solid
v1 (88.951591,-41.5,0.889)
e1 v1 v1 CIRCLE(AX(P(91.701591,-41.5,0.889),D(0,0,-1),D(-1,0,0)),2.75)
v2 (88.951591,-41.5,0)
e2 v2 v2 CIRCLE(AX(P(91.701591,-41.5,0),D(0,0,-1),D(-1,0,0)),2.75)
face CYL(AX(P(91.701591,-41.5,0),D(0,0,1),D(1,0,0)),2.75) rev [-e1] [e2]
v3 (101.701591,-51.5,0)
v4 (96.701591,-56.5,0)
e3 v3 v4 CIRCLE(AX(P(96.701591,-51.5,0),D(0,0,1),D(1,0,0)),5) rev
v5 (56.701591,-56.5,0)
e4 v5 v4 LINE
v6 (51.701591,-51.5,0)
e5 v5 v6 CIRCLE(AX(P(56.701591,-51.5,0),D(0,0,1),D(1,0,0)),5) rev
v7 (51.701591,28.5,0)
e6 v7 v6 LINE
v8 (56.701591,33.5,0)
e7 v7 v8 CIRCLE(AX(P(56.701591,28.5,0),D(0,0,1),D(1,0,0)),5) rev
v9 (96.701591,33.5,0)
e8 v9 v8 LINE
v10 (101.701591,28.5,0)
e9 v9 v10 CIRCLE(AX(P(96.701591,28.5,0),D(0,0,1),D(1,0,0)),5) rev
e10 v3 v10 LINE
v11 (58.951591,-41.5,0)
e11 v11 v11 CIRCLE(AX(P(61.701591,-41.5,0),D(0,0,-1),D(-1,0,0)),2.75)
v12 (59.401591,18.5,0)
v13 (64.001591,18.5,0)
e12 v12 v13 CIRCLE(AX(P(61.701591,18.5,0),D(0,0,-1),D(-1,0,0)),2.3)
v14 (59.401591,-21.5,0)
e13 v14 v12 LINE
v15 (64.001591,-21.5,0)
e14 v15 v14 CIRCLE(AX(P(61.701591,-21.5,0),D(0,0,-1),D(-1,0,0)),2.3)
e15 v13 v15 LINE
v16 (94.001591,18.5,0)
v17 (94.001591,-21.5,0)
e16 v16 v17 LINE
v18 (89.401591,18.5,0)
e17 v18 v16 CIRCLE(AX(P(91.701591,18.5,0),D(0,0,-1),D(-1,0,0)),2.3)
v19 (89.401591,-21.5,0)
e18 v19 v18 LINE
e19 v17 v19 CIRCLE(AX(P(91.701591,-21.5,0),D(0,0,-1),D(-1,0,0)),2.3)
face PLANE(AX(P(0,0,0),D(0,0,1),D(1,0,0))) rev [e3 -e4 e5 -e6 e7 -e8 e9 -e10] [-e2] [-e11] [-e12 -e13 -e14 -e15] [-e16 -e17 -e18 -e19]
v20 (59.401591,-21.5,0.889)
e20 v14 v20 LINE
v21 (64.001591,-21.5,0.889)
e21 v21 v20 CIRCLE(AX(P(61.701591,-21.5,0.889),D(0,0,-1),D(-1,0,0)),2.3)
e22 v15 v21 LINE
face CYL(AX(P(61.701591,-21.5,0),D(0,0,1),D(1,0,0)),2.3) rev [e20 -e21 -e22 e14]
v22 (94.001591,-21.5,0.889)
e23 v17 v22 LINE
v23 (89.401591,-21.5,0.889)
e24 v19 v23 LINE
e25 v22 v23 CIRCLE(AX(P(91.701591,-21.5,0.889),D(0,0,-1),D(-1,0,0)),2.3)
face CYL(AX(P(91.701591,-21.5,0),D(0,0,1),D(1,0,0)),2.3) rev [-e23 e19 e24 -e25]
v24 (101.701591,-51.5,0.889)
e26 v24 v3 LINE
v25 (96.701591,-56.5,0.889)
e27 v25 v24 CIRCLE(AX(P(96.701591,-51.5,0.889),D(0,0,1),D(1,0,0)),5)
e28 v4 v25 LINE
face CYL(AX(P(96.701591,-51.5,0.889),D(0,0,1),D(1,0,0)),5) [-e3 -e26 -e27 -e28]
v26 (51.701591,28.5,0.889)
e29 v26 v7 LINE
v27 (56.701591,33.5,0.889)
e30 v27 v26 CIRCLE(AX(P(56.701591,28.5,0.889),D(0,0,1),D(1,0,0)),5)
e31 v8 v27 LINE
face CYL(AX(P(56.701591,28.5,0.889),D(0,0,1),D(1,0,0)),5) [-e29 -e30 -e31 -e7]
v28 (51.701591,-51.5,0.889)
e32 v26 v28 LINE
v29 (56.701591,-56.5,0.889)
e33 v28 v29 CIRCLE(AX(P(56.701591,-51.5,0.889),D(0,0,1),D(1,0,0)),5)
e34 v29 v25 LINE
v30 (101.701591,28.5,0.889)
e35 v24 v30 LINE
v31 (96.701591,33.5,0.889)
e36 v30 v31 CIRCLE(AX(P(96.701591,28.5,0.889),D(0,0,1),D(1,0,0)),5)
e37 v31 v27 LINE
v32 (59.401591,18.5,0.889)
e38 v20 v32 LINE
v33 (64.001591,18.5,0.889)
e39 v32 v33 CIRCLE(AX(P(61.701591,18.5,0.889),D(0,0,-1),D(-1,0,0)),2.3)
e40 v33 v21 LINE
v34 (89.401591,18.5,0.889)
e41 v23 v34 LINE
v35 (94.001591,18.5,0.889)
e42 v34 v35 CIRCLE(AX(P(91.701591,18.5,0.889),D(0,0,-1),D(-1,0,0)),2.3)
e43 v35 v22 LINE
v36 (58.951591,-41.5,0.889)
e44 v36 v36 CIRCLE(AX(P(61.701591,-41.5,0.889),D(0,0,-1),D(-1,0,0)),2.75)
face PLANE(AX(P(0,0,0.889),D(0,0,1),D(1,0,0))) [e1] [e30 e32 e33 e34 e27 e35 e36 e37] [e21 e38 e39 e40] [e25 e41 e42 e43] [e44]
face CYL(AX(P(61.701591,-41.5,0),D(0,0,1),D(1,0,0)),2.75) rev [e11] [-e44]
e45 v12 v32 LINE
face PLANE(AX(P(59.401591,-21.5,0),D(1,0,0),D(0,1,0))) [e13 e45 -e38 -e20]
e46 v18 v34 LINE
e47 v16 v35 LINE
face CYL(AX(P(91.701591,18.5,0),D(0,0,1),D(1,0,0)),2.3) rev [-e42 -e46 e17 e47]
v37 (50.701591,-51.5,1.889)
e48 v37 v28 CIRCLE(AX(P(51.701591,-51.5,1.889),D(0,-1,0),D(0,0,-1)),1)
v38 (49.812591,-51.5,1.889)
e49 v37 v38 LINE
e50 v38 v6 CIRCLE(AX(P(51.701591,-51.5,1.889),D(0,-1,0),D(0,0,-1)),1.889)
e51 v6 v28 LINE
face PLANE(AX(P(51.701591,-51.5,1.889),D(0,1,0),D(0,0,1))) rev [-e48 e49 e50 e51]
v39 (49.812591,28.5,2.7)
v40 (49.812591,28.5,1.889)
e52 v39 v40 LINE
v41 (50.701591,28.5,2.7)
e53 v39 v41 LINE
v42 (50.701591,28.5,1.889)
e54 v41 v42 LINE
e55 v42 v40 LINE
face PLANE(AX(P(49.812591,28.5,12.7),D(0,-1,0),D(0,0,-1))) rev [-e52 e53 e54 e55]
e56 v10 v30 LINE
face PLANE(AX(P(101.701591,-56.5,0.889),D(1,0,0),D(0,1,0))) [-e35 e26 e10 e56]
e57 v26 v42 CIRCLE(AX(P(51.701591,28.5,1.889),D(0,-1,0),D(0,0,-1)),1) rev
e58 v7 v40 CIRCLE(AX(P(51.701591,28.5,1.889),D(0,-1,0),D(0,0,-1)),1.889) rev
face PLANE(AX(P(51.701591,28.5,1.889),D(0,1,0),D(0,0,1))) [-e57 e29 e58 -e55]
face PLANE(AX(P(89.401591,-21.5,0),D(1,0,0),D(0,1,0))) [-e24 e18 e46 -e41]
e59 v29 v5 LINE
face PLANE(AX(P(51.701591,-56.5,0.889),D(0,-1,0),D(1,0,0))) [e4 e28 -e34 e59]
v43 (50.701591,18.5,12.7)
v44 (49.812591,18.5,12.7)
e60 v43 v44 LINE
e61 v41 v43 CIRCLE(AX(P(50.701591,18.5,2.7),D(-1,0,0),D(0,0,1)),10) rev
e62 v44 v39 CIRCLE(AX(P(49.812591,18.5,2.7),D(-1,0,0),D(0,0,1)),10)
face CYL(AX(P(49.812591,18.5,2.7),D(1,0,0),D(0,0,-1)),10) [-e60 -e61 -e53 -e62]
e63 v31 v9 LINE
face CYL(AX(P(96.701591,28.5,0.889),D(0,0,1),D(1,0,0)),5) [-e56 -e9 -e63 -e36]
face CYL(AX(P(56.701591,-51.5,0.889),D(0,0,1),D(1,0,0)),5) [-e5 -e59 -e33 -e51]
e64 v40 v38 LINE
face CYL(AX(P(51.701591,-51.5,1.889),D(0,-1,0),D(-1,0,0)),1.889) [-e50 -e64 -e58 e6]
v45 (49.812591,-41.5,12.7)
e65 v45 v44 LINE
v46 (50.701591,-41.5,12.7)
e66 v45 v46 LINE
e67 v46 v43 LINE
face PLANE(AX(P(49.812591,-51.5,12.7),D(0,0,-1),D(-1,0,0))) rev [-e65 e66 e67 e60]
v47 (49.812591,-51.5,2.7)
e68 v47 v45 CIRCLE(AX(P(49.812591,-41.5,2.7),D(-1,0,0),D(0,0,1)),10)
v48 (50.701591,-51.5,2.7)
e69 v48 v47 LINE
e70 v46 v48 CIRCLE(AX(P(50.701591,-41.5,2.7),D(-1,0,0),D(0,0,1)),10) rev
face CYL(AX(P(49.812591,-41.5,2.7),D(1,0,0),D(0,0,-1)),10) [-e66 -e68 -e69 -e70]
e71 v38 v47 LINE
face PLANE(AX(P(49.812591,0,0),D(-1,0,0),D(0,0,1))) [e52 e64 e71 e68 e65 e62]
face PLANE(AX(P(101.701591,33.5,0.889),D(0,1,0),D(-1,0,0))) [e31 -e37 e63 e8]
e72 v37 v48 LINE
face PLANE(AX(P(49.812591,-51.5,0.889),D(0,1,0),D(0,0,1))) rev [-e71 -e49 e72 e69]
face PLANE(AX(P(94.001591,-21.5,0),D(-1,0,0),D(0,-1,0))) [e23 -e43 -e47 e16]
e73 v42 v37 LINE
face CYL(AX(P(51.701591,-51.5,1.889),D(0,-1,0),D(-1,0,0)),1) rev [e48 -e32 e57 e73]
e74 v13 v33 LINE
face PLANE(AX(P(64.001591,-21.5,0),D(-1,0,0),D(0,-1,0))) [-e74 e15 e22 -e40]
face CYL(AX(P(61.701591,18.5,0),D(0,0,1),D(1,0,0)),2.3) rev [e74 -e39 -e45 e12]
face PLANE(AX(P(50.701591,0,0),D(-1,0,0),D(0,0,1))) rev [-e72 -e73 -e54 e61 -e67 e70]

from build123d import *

# Parameters (mm, degrees)
SKETCH1_W           = 50
SKETCH1_H           = 90
BOSS_EXTRUDE1_DEPTH = 0.889
SKETCH2_R           = 2.75
CUT_EXTRUDE1_DEPTH  = 117.345408204
BREAK_CORNER1_DEPTH = 0.889
EDGE_FLANGE1_DEPTH  = 80
BREAK_CORNER2_START = 49.812591379
BREAK_CORNER2_DEPTH = 0.889


# Read off the part's stored shape, not the designer's step: Break-Corner1, Break-Corner2
# Sheet-metal steps are written as plain solids
with BuildPart() as part:
    # Sketch1 → Boss-Extrude1 (new body)
    with BuildSketch(Plane.XY):
        with Locations((76.701591379, -11.5)):
            Rectangle(SKETCH1_W, SKETCH1_H)
    extrude(amount=BOSS_EXTRUDE1_DEPTH)

    # Sketch2 → Cut-Extrude1 (cut, through all)
    with BuildSketch(Plane(origin=(0, 0, 0.889), x_dir=(-1, 0, 0), z_dir=(0, 0, -1))):
        with Locations((-61.701591379, -41.5)):
            Circle(SKETCH2_R)
        with Locations((-91.701591379, -41.5)):
            Circle(SKETCH2_R)
        with BuildLine():
            Line((-64.001591379, -21.5), (-64.001591379, 18.5))
            ThreePointArc((-64.001591379, 18.5), (-61.701591379, 20.8), (-59.401591379, 18.5))
            Line((-59.401591379, 18.5), (-59.401591379, -21.5))
            ThreePointArc((-59.401591379, -21.5), (-61.701591379, -23.8), (-64.001591379, -21.5))
        make_face()
        with BuildLine():
            Line((-94.001591379, -21.5), (-94.001591379, 18.5))
            ThreePointArc((-94.001591379, 18.5), (-91.701591379, 20.8), (-89.401591379, 18.5))
            Line((-89.401591379, 18.5), (-89.401591379, -21.5))
            ThreePointArc((-89.401591379, -21.5), (-91.701591379, -23.8), (-94.001591379, -21.5))
        make_face()
    extrude(amount=CUT_EXTRUDE1_DEPTH, mode=Mode.SUBTRACT)

    # Break-Corner1 outline → Break-Corner1 (cut)
    with BuildSketch(Plane.XY):
        with BuildLine():
            ThreePointArc((51.701591379, 28.5), (53.166057473, 32.035533906), (56.701591379, 33.5))
            Line((56.701591379, 33.5), (51.701591379, 33.5))
            Line((51.701591379, 33.5), (51.701591379, 28.5))
        make_face()
        with BuildLine():
            Line((101.701591379, 33.5), (96.701591379, 33.5))
            ThreePointArc((96.701591379, 33.5), (100.237125285, 32.035533906), (101.701591379, 28.5))
            Line((101.701591379, 28.5), (101.701591379, 33.5))
        make_face()
        with BuildLine():
            ThreePointArc((56.701591379, -56.5), (53.166057474, -55.035533906), (51.701591379, -51.5))
            Line((51.701591379, -51.5), (51.701591379, -56.5))
            Line((51.701591379, -56.5), (56.701591379, -56.5))
        make_face()
        with BuildLine():
            Line((101.701591379, -56.5), (101.701591379, -51.5))
            ThreePointArc((101.701591379, -51.5), (100.237125285, -55.035533906), (96.701591379, -56.5))
            Line((96.701591379, -56.5), (101.701591379, -56.5))
        make_face()
    extrude(amount=BREAK_CORNER1_DEPTH, mode=Mode.SUBTRACT)

    # Edge-Flange1 section (across the edge) → Edge-Flange1 (add)
    with BuildSketch(Plane(origin=(50.701591379, 28.5, 0.889), x_dir=(1, 0, 0), z_dir=(0, -1, 0))):
        with BuildLine():
            Line((-0.889, 1), (-0.889, 11.811))
            Line((-0.889, 11.811), (0, 11.811))
            Line((0, 11.811), (0, 1))
            ThreePointArc((0, 1), (0.292893219, 0.292893219), (1, 0))
            Line((1, 0), (1, -0.889))
            ThreePointArc((1, -0.889), (-0.33572471, -0.33572471), (-0.889, 1))
        make_face()
    extrude(amount=EDGE_FLANGE1_DEPTH)

    # Break-Corner2 outline → Break-Corner2 (cut)
    with BuildSketch(Plane.YZ.offset(BREAK_CORNER2_START)):
        with BuildLine():
            ThreePointArc((-51.5, 2.7), (-48.571067812, 9.771067812), (-41.5, 12.7))
            Line((-41.5, 12.7), (-51.5, 12.7))
            Line((-51.5, 12.7), (-51.5, 2.7))
        make_face()
        with BuildLine():
            Line((28.5, 12.7), (18.5, 12.7))
            ThreePointArc((18.5, 12.7), (25.571067812, 9.771067812), (28.5, 2.7))
            Line((28.5, 2.7), (28.5, 12.7))
        make_face()
    extrude(amount=BREAK_CORNER2_DEPTH, mode=Mode.SUBTRACT)


solid = part.part
